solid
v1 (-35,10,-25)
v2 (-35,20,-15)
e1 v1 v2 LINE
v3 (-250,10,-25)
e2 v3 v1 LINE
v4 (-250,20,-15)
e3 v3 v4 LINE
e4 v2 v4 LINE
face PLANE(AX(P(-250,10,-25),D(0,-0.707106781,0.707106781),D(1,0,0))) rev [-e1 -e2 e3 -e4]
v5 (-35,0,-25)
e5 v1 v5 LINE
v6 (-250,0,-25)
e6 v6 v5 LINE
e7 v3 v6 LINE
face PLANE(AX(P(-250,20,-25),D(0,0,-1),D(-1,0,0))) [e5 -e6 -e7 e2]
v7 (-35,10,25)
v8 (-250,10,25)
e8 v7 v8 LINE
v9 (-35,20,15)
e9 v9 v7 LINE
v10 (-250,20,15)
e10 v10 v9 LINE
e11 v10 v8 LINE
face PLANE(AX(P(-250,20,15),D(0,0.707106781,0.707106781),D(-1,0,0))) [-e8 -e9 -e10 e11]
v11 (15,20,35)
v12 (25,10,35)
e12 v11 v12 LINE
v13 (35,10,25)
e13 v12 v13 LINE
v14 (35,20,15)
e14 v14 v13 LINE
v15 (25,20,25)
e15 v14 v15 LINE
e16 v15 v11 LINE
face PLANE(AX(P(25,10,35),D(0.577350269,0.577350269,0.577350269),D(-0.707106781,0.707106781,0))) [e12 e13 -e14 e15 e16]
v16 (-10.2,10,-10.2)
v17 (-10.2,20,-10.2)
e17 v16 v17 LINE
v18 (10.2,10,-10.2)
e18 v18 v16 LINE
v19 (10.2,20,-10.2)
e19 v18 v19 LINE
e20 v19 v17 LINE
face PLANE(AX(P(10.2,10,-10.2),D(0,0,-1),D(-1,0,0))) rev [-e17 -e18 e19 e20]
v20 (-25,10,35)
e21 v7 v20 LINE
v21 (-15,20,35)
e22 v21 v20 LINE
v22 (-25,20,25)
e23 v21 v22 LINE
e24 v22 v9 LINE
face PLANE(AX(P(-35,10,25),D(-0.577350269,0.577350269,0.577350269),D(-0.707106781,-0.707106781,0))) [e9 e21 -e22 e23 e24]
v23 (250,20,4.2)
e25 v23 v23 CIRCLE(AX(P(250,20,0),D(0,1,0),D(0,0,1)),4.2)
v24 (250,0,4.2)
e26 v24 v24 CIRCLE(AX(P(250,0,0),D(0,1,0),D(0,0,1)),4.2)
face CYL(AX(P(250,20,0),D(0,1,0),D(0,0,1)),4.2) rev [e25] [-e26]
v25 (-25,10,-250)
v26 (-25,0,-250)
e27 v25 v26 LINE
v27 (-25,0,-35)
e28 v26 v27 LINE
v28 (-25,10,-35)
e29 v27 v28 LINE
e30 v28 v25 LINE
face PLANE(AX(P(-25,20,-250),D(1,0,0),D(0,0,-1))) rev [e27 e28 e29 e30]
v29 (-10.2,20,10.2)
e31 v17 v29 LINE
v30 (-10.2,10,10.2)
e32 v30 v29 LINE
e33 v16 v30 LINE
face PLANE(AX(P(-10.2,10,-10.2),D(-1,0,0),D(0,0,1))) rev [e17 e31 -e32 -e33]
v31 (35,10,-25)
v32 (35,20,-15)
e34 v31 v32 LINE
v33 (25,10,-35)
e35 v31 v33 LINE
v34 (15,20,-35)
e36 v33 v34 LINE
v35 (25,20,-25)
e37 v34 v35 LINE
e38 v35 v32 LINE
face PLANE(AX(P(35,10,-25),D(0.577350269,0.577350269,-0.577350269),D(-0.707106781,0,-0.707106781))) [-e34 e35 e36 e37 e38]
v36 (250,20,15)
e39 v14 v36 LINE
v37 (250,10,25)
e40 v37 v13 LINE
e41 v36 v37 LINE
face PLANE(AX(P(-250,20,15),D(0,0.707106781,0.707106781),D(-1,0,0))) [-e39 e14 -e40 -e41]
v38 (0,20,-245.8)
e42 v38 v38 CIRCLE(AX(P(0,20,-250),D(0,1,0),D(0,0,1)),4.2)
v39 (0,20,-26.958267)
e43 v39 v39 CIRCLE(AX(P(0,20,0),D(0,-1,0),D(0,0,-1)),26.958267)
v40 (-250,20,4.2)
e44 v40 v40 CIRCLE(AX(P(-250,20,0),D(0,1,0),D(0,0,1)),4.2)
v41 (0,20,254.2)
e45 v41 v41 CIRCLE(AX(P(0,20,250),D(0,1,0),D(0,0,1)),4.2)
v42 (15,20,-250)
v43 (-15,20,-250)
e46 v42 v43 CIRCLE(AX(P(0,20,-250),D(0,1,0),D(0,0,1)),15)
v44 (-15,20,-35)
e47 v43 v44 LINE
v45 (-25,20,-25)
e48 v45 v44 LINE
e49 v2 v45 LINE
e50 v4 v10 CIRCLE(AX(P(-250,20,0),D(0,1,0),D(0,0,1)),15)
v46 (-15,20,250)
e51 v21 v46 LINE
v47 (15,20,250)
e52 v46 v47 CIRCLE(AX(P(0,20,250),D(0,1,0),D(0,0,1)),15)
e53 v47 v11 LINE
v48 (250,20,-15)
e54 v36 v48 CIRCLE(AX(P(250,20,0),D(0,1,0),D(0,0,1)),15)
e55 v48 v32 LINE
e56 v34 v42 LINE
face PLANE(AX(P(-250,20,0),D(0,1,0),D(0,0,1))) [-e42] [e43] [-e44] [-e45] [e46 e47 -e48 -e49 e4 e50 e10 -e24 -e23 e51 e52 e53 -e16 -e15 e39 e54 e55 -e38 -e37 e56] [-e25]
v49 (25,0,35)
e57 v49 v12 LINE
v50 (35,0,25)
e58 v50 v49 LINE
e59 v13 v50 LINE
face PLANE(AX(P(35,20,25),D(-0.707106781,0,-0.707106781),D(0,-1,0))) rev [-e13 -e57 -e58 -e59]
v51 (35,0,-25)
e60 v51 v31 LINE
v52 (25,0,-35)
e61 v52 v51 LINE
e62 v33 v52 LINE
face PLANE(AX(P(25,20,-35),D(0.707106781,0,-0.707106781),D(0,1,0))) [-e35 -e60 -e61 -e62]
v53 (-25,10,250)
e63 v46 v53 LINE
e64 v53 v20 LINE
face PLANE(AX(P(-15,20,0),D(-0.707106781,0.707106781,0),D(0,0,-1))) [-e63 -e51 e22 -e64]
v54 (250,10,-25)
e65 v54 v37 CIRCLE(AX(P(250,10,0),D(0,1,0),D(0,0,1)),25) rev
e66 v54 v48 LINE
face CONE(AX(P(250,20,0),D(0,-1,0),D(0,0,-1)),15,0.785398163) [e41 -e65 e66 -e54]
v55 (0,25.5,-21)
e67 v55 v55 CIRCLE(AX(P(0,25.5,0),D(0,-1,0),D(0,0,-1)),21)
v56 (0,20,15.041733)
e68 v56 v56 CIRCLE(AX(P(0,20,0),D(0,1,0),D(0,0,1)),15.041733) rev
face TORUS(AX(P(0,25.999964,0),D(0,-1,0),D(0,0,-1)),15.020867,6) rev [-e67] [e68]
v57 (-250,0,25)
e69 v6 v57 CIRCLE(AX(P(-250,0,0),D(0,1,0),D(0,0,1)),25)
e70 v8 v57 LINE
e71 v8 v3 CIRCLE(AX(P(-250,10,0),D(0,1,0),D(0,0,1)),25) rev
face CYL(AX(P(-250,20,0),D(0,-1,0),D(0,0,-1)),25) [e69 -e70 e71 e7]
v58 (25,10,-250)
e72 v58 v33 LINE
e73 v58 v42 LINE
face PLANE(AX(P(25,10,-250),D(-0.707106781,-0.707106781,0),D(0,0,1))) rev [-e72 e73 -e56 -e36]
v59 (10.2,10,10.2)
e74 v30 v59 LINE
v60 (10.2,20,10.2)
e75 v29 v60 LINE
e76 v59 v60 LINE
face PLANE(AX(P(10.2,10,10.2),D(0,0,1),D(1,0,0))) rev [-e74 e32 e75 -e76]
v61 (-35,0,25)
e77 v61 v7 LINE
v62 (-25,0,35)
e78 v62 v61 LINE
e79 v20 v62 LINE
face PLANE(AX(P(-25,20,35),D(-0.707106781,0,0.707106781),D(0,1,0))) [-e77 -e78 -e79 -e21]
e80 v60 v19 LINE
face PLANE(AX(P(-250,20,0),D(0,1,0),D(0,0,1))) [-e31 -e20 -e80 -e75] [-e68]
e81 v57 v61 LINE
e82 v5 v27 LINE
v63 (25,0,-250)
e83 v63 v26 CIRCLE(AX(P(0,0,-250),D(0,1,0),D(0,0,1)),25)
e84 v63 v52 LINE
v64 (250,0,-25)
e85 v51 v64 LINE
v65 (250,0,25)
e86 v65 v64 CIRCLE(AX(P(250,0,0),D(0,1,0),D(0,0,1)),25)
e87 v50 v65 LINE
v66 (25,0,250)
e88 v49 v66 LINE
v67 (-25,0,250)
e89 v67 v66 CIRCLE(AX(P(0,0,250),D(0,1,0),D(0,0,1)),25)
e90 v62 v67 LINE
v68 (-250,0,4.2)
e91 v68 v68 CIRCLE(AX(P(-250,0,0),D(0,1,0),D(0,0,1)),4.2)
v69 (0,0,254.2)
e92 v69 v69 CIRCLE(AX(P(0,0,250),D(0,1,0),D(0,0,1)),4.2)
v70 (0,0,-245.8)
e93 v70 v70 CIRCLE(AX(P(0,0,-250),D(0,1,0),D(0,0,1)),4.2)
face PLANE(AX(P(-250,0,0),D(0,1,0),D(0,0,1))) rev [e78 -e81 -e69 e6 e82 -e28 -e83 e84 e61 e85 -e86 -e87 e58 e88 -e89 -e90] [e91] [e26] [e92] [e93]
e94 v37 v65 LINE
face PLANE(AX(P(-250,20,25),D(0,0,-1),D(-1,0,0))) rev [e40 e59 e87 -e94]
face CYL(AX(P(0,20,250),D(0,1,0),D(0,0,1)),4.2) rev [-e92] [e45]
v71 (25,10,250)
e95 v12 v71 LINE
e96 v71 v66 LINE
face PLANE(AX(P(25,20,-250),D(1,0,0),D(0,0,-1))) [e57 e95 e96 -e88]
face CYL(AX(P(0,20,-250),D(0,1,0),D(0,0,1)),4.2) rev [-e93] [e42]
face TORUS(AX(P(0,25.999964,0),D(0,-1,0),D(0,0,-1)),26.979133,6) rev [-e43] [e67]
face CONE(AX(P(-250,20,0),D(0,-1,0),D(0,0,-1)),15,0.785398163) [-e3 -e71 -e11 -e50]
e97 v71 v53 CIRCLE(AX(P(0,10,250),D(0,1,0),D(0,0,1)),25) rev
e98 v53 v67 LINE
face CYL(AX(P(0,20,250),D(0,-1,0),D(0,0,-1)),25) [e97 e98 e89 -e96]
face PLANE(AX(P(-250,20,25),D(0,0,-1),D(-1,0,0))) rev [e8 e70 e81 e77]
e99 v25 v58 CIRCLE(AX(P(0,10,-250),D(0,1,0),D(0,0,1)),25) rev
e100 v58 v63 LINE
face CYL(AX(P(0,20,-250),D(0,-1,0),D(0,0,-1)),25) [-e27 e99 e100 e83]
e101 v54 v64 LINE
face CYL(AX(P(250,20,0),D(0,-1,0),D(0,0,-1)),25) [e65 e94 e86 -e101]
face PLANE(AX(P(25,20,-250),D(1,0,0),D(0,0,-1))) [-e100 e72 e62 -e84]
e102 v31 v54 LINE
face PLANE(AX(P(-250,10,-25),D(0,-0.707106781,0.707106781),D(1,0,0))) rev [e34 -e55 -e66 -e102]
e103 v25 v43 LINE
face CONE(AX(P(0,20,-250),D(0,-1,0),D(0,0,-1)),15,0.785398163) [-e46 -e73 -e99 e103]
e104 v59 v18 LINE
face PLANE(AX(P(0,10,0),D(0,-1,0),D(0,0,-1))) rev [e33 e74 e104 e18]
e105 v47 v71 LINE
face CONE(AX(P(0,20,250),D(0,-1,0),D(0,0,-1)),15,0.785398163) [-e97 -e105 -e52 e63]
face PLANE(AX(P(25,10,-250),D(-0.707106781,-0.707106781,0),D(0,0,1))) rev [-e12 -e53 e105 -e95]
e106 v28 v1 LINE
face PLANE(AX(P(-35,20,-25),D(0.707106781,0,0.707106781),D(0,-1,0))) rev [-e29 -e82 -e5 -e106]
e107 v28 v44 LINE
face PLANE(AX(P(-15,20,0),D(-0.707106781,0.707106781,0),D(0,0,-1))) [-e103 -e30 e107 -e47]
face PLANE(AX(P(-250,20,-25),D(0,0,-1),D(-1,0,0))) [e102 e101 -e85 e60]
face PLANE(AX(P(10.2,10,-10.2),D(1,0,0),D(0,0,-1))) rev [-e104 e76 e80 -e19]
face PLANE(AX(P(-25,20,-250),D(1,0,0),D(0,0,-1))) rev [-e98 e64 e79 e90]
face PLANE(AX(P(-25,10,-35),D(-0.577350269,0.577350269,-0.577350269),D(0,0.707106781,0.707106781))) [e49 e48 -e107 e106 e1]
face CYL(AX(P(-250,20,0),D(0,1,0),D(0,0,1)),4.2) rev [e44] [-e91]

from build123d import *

# Parameters (mm, degrees)
BOSS_EXTRUDE1_DEPTH  = 20
CHAMFER1_SIZE        = 10
M8_CLEARANCE_HOLE1_D = 8.4
SKETCH13_W           = 20.4
SKETCH13_H           = 20.4
CUT_EXTRUDE1_DEPTH   = 10


# Read off the part's stored shape, not the designer's step: Revolve1
with BuildPart() as part:
    # Sketch1 → Boss-Extrude1 (new body)
    with BuildSketch(Plane(origin=(0, 0, 0), x_dir=(1, 0, 0), z_dir=(0, 1, 0))):
        with BuildLine():
            Line((25, 250), (25, -250))
            ThreePointArc((25, -250), (0, -275), (-25, -250))
            Line((-25, -250), (-25, 250))
            ThreePointArc((-25, 250), (0, 275), (25, 250))
        make_face()
        with BuildLine():
            Line((-250, 25), (250, 25))
            ThreePointArc((250, 25), (275, 0), (250, -25))
            Line((250, -25), (-250, -25))
            ThreePointArc((-250, -25), (-275, 0), (-250, 25))
        make_face()
    extrude(amount=BOSS_EXTRUDE1_DEPTH)

    # Chamfer1
    chamfer1_edges = [part.edges().sort_by_distance(p)[0] for p in [
        (275, 20, 0),
        (137.5, 20, 25),
        (137.5, 20, -25),
        (-137.5, 20, -25),
        (25, 10, -25),
        (-25, 10, -25),
        (25, 10, 25),
        (-25, 10, 25),
        (25, 20, -137.5),
        (25, 20, 137.5),
        (0, 20, 275),
        (-25, 20, -137.5),
        (-25, 20, 137.5),
        (0, 20, -275),
        (-275, 20, 0),
        (-137.5, 20, 25),
    ]]
    chamfer(chamfer1_edges, length=CHAMFER1_SIZE)

    # M8 Clearance Hole1 (through all)
    with Locations(Plane(origin=(0, 20, 0), x_dir=(1, 0, 0), z_dir=(0, 1, 0))):
        with Locations((-250, 0), (0, 250), (250, 0), (0, -250)):
            Hole(M8_CLEARANCE_HOLE1_D / 2)

    # Sketch13 → Cut-Extrude1 (cut)
    with BuildSketch(Plane(origin=(0, 20, 0), x_dir=(1, 0, 0), z_dir=(0, 1, 0))):
        Rectangle(SKETCH13_W, SKETCH13_H)
    extrude(amount=-CUT_EXTRUDE1_DEPTH, mode=Mode.SUBTRACT)

    # Revolve1 outline → Revolve1 (revolve)
    with BuildSketch(Plane.XY):
        with BuildLine():
            ThreePointArc((26.958266811, 20), (22.909428257, 21.591165693), (21, 25.5))
            ThreePointArc((21, 25.5), (19.090571743, 21.591165693), (15.041733189, 20))
            Line((15.041733189, 20), (26.958266811, 20))
        make_face()
    revolve(axis=Axis((0, 0, 0), (0, 1, 0)))


solid = part.part
